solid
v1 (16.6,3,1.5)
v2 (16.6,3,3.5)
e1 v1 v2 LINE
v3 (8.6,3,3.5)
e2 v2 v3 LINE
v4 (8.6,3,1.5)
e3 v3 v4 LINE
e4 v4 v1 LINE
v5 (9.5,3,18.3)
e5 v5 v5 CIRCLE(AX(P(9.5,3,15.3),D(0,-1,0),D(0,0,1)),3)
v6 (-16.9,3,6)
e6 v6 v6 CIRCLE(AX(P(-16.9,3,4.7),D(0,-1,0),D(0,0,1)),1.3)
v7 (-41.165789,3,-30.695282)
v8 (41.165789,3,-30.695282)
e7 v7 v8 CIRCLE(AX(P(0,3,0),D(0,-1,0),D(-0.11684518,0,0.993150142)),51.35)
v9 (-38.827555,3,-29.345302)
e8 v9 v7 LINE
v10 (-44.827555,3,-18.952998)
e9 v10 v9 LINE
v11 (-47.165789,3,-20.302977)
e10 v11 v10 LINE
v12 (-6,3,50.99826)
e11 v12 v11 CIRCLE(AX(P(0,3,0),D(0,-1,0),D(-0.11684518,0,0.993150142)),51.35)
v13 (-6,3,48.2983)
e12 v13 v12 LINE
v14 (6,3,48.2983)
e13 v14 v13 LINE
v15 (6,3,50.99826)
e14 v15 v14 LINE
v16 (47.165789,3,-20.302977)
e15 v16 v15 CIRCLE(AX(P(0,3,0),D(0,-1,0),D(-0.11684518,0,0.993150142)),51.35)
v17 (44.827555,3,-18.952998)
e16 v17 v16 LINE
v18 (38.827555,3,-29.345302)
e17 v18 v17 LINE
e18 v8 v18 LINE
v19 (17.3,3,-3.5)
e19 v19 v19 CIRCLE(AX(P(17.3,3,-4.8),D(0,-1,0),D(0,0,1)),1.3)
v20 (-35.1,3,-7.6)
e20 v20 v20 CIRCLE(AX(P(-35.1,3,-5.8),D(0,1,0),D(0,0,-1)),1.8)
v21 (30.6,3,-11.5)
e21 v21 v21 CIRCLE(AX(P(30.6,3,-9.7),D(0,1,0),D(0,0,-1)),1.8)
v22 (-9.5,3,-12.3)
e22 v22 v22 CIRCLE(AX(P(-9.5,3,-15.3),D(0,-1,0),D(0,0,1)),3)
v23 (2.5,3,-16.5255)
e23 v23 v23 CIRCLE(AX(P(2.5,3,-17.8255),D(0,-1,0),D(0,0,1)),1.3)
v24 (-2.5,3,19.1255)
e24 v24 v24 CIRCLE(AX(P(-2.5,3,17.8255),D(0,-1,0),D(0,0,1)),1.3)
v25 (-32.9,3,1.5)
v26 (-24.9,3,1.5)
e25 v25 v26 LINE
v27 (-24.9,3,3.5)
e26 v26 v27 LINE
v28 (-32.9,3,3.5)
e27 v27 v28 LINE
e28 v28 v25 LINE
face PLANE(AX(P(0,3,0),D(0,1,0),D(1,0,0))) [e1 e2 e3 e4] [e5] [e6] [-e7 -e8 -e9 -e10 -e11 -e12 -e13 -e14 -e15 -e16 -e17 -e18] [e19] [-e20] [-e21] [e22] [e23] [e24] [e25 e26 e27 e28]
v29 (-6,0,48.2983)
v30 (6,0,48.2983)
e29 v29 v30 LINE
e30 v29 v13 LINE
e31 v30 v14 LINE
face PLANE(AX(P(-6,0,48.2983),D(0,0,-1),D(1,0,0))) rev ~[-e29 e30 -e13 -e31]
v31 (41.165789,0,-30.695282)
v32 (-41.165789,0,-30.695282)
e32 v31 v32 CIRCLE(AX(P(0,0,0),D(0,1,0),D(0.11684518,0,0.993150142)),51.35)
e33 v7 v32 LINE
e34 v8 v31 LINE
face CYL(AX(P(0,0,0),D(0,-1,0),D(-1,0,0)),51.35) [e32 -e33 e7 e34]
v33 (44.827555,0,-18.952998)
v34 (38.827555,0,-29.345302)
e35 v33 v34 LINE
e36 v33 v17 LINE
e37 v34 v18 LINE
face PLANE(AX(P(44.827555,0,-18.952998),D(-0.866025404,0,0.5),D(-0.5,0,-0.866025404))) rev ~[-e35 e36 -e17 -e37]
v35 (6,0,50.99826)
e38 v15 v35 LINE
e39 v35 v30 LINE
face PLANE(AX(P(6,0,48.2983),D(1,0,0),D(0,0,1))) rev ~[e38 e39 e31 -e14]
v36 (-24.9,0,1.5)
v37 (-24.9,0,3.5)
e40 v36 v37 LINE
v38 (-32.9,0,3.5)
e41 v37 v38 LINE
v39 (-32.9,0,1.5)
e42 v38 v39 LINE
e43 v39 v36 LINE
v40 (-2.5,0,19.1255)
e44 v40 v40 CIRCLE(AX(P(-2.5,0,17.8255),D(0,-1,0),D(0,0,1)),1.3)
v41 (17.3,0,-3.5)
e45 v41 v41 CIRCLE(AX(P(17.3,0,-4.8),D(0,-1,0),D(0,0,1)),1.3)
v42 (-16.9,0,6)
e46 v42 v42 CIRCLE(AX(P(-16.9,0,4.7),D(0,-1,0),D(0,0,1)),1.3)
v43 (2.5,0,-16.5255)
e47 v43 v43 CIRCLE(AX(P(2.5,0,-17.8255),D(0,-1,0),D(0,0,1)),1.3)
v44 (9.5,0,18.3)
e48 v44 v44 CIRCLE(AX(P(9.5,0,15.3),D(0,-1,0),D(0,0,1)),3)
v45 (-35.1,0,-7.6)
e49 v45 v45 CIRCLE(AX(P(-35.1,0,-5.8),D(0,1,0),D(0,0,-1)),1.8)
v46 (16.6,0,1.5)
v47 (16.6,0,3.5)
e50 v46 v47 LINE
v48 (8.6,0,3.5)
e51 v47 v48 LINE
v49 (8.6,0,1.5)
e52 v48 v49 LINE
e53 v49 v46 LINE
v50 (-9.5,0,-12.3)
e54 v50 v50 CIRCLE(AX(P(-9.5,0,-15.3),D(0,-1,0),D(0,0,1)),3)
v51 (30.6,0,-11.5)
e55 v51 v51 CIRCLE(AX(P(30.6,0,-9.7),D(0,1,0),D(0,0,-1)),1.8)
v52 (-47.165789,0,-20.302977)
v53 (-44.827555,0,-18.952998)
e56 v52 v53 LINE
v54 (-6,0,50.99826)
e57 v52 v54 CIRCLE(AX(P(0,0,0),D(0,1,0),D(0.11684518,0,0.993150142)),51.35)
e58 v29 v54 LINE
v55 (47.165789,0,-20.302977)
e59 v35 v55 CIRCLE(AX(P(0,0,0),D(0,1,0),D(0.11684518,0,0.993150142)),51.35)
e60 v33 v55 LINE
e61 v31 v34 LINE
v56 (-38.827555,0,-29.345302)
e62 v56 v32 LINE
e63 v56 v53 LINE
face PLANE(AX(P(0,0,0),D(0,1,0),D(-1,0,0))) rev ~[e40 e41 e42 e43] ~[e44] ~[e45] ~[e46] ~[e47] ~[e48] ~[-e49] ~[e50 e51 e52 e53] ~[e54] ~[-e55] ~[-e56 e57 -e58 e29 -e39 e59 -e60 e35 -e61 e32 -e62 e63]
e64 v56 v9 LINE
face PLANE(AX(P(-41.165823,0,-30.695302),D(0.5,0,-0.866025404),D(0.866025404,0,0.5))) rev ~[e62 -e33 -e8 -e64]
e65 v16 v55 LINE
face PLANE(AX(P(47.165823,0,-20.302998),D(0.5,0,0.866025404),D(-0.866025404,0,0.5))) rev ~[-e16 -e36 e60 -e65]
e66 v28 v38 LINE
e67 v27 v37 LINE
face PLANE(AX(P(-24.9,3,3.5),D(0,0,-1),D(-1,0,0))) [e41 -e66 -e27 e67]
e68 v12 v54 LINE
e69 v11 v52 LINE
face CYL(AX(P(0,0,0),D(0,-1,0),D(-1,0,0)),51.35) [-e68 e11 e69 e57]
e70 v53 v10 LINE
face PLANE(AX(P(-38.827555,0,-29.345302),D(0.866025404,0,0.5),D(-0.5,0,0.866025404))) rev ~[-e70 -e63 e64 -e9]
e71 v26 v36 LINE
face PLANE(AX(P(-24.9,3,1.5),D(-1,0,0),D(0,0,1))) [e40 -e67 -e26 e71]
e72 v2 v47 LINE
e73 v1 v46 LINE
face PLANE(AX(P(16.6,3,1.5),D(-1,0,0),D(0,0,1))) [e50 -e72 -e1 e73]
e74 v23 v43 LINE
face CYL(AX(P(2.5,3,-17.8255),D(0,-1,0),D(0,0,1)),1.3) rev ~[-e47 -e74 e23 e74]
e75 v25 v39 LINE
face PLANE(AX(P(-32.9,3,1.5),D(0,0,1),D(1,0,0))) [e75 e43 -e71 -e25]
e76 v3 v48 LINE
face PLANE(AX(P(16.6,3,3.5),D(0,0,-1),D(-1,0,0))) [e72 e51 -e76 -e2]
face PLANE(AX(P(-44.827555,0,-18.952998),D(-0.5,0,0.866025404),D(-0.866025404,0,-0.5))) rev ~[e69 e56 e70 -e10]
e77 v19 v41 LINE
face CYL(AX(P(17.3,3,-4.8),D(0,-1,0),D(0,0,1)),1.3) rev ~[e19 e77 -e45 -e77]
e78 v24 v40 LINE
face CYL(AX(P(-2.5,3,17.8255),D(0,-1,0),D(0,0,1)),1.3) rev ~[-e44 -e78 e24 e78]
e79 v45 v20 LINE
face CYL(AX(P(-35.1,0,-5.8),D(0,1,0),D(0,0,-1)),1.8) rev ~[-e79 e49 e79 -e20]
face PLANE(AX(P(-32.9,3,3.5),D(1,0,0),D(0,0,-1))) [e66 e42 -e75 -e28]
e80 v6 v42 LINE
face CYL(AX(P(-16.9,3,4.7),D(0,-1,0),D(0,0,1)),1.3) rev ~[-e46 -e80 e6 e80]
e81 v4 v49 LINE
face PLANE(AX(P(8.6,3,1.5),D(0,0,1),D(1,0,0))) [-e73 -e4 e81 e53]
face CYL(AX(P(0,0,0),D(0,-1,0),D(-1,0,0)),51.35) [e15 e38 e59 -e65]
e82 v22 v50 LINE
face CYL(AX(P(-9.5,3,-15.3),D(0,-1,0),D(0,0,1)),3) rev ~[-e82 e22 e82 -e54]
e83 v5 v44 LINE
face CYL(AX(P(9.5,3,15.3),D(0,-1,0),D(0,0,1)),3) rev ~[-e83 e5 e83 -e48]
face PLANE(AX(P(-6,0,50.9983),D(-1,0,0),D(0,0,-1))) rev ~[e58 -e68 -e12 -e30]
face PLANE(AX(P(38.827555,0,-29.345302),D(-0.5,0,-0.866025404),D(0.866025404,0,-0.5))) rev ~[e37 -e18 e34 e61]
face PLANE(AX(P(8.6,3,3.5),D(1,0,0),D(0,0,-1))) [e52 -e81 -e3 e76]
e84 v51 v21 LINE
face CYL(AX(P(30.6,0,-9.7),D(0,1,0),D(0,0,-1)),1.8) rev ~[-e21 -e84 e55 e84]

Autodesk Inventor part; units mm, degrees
ref_plane "YZ Plane" through (0, 0, 0) normal (1, 0, 0) x (0, 1, 0)
ref_plane "XZ Plane" through (0, 0, 0) normal (0, 1, 0) x (-1, 0, 0)
ref_plane "XY Plane" through (0, 0, 0) normal (0, 0, 1) x (1, 0, 0)
sketch "Sketch9" plane through (0, 3, 0) normal (0, 1, 0) x (1, 0, 0)
  line L0 (10.4056, -28.6) -> (-19.5944, -28.6)
  line L1 (-19.5944, -28.6) -> (-19.5944, -24.6)
  line L2 (-19.5944, -24.6) -> (10.4056, -24.6)
  line L3 (10.4056, -24.6) -> (10.4056, -28.6)
  point P0 (0, 0)
sketch "Sketch1" plane through (0, 0, 0) normal (0, 1, 0) x (-1, 0, 0)
  circle A0 centre (0, 0) radius 51.35
  dimension "d0" = 102.7
extrude "Plate1" add sketch "Sketch1" along normal blind 3
sketch "Sketch2" plane through (0, 0, 0) normal (0, 1, 0) x (-1, 0, 0)
  line L0 (6, 48.2983) -> (-6, 48.2983)
  line L1 (-6, 48.2983) -> (-6, 53.6983)
  line L2 (-6, 53.6983) -> (6, 53.6983)
  line L3 (6, 53.6983) -> (6, 48.2983)
  line L4 (6, 48.2983) -> (-6, 48.2983)
  line L5 (-6, 48.2983) -> (-6, 50.9983)
  line L6 (-6, 50.9983) -> (6, 50.9983)
  line L7 (6, 50.9983) -> (6, 48.2983)
  circle A0 centre (0, 0) radius 51.35 projected
  point P0 (0, 48.2983)
  point P1 (0, 48.2983)
  dimension "d2" = 2.7
  dimension "d3" = 12
extrude "Cut1" cut sketch "Sketch2" along normal through all contours L0 L1 L6 L3 | A0 L1 L2 L3 | L6 A0
pattern_circular "Circular Pattern1" count 3 over 360 about axis through (0, -10, 0) along (0, 1, 0) of "Cut1"
sketch "Sketch3" plane through (0, 0, 0) normal (0, 1, 0) x (-1, 0, 0)
  point P0 (0, 0)
  point P1 (35.1, -5.8)
  point P2 (-30.6, -9.7)
  dimension "d9" = 5.8
  dimension "d10" = 35.1
  dimension "d11" = 9.7
  dimension "d12" = 30.6
hole "Hole1" at (-35.1, 0, -5.8) at (30.6, 0, -9.7) direction (0, 1, 0) diameter 3.6 end through all
sketch "Sketch4" plane through (0, 3, 0) normal (0, 1, 0) x (1, 0, 0)
  point P0 (0, 0)
  point P1 (-16.9, -4.7)
  point P2 (17.3, 4.8)
  dimension "d20" = 4.7
  dimension "d21" = 16.9
  dimension "d22" = 17.3
  dimension "d23" = 4.8
hole "Hole2" at (-16.9, 3, 4.7) at (17.3, 3, -4.8) direction (0, -1, 0) diameter 2.6 end through all
sketch "Sketch5" plane through (0, 3, 0) normal (0, 1, 0) x (1, 0, 0)
  point P0 (0, 0)
  point P1 (-9.5, 15.3)
  point P2 (9.5, -15.3)
  dimension "d31" = 9.5
  dimension "d32" = 15.3
  dimension "d33" = 9.5
  dimension "d34" = 15.3
hole "Hole3" at (-9.5, 3, -15.3) at (9.5, 3, 15.3) direction (0, -1, 0) diameter 6 end through all
sketch "Sketch6" plane through (0, 3, 0) normal (0, 1, 0) x (1, 0, 0)
  line L0 (-32.9, -1.5) -> (-24.9, -1.5)
  line L1 (-24.9, -1.5) -> (-24.9, -3.5)
  line L2 (-24.9, -3.5) -> (-32.9, -3.5)
  line L3 (-32.9, -3.5) -> (-32.9, -1.5)
  line L4 (8.6, -1.5) -> (16.6, -1.5)
  line L5 (16.6, -1.5) -> (16.6, -3.5)
  line L6 (16.6, -3.5) -> (8.6, -3.5)
  line L7 (8.6, -3.5) -> (8.6, -1.5)
  line L8 (-19.5944, -24.6) -> (10.4056, -24.6)
  line L9 (10.4056, -24.6) -> (10.4056, -28.6)
  line L10 (10.4056, -28.6) -> (-19.5944, -28.6)
  line L11 (-19.5944, -28.6) -> (-19.5944, -24.6)
  point P0 (0, 0)
  dimension "d42" = 8
  dimension "d43" = 8
  dimension "d44" = 33.5
  dimension "d45" = 24.9
  dimension "d46" = 2
  dimension "d47" = 1.5
  dimension "d48" = 21.1
  dimension "d49" = 30
  dimension "d50" = 4
extrude "Cut2" cut sketch "Sketch6" against normal blind 3
sketch "Sketch7" plane through (0, 3, 0) normal (0, 1, 0) x (1, 0, 0)
  point P0 (0, 0)
  point P1 (0, 18)
  point P2 (0, -18)
  dimension "d53" = 18
  dimension "d54" = 18
hole "Hole4" [suppressed]
sketch "Sketch8" plane through (0, 3, 0) normal (0, 1, 0) x (1, 0, 0)
  circle A0 centre (0, 0) radius 18
  point P0 (2.5, 17.8255)
  point P1 (-2.5, -17.8255)
  dimension "d62" = 36
  dimension "d63" = 2.5
  dimension "d64" = 2.5
hole "Hole5" at (2.5, 3, -17.8255) at (-2.5, 3, 17.8255) direction (0, -1, 0) diameter 2.6 end through all
sheet face with bend "Face2" sketch "Sketch9" thickness 3 toward (0, -1, 0) bend radius 3
bend "Bend1"
equation "\"d4\" = Thickness"
equation "\"d18\" = Thickness"
equation "\"d29\" = Thickness"
equation "\"d40\" = Thickness"
equation "\"d51\" = Thickness"
equation "\"d60\" = Thickness"
equation "\"d70\" = Thickness"
equation "\"d77\" = Thickness"
equation "\"d72\" = BendRadius"
equation "\"d73\" = BendReliefWidth"
equation "\"d75\" = MinimumRemnant"
equation "\"d74\" = BendReliefDepth"
equation "\"d76\" = BendRadius"
equation "\"BendRadius\" = Thickness"
equation "\"BendReliefWidth\" = Thickness"
equation "\"BendReliefDepth\" = 0.5 * Thickness"
equation "\"CornerReliefSize\" = 4 * Thickness"
equation "\"MinimumRemnant\" = 2 * Thickness"
equation "\"TransitionRadius\" = BendRadius"
equation "\"JacobiRadiusSize\" = BendRadius"
equation "\"GapSize\" = Thickness"
equation "\"d1\" = BendRadius"
equation "\"Thickness\" = 3"
properties part number "LUXCAN BASE DE MONTAJE LENTE"
